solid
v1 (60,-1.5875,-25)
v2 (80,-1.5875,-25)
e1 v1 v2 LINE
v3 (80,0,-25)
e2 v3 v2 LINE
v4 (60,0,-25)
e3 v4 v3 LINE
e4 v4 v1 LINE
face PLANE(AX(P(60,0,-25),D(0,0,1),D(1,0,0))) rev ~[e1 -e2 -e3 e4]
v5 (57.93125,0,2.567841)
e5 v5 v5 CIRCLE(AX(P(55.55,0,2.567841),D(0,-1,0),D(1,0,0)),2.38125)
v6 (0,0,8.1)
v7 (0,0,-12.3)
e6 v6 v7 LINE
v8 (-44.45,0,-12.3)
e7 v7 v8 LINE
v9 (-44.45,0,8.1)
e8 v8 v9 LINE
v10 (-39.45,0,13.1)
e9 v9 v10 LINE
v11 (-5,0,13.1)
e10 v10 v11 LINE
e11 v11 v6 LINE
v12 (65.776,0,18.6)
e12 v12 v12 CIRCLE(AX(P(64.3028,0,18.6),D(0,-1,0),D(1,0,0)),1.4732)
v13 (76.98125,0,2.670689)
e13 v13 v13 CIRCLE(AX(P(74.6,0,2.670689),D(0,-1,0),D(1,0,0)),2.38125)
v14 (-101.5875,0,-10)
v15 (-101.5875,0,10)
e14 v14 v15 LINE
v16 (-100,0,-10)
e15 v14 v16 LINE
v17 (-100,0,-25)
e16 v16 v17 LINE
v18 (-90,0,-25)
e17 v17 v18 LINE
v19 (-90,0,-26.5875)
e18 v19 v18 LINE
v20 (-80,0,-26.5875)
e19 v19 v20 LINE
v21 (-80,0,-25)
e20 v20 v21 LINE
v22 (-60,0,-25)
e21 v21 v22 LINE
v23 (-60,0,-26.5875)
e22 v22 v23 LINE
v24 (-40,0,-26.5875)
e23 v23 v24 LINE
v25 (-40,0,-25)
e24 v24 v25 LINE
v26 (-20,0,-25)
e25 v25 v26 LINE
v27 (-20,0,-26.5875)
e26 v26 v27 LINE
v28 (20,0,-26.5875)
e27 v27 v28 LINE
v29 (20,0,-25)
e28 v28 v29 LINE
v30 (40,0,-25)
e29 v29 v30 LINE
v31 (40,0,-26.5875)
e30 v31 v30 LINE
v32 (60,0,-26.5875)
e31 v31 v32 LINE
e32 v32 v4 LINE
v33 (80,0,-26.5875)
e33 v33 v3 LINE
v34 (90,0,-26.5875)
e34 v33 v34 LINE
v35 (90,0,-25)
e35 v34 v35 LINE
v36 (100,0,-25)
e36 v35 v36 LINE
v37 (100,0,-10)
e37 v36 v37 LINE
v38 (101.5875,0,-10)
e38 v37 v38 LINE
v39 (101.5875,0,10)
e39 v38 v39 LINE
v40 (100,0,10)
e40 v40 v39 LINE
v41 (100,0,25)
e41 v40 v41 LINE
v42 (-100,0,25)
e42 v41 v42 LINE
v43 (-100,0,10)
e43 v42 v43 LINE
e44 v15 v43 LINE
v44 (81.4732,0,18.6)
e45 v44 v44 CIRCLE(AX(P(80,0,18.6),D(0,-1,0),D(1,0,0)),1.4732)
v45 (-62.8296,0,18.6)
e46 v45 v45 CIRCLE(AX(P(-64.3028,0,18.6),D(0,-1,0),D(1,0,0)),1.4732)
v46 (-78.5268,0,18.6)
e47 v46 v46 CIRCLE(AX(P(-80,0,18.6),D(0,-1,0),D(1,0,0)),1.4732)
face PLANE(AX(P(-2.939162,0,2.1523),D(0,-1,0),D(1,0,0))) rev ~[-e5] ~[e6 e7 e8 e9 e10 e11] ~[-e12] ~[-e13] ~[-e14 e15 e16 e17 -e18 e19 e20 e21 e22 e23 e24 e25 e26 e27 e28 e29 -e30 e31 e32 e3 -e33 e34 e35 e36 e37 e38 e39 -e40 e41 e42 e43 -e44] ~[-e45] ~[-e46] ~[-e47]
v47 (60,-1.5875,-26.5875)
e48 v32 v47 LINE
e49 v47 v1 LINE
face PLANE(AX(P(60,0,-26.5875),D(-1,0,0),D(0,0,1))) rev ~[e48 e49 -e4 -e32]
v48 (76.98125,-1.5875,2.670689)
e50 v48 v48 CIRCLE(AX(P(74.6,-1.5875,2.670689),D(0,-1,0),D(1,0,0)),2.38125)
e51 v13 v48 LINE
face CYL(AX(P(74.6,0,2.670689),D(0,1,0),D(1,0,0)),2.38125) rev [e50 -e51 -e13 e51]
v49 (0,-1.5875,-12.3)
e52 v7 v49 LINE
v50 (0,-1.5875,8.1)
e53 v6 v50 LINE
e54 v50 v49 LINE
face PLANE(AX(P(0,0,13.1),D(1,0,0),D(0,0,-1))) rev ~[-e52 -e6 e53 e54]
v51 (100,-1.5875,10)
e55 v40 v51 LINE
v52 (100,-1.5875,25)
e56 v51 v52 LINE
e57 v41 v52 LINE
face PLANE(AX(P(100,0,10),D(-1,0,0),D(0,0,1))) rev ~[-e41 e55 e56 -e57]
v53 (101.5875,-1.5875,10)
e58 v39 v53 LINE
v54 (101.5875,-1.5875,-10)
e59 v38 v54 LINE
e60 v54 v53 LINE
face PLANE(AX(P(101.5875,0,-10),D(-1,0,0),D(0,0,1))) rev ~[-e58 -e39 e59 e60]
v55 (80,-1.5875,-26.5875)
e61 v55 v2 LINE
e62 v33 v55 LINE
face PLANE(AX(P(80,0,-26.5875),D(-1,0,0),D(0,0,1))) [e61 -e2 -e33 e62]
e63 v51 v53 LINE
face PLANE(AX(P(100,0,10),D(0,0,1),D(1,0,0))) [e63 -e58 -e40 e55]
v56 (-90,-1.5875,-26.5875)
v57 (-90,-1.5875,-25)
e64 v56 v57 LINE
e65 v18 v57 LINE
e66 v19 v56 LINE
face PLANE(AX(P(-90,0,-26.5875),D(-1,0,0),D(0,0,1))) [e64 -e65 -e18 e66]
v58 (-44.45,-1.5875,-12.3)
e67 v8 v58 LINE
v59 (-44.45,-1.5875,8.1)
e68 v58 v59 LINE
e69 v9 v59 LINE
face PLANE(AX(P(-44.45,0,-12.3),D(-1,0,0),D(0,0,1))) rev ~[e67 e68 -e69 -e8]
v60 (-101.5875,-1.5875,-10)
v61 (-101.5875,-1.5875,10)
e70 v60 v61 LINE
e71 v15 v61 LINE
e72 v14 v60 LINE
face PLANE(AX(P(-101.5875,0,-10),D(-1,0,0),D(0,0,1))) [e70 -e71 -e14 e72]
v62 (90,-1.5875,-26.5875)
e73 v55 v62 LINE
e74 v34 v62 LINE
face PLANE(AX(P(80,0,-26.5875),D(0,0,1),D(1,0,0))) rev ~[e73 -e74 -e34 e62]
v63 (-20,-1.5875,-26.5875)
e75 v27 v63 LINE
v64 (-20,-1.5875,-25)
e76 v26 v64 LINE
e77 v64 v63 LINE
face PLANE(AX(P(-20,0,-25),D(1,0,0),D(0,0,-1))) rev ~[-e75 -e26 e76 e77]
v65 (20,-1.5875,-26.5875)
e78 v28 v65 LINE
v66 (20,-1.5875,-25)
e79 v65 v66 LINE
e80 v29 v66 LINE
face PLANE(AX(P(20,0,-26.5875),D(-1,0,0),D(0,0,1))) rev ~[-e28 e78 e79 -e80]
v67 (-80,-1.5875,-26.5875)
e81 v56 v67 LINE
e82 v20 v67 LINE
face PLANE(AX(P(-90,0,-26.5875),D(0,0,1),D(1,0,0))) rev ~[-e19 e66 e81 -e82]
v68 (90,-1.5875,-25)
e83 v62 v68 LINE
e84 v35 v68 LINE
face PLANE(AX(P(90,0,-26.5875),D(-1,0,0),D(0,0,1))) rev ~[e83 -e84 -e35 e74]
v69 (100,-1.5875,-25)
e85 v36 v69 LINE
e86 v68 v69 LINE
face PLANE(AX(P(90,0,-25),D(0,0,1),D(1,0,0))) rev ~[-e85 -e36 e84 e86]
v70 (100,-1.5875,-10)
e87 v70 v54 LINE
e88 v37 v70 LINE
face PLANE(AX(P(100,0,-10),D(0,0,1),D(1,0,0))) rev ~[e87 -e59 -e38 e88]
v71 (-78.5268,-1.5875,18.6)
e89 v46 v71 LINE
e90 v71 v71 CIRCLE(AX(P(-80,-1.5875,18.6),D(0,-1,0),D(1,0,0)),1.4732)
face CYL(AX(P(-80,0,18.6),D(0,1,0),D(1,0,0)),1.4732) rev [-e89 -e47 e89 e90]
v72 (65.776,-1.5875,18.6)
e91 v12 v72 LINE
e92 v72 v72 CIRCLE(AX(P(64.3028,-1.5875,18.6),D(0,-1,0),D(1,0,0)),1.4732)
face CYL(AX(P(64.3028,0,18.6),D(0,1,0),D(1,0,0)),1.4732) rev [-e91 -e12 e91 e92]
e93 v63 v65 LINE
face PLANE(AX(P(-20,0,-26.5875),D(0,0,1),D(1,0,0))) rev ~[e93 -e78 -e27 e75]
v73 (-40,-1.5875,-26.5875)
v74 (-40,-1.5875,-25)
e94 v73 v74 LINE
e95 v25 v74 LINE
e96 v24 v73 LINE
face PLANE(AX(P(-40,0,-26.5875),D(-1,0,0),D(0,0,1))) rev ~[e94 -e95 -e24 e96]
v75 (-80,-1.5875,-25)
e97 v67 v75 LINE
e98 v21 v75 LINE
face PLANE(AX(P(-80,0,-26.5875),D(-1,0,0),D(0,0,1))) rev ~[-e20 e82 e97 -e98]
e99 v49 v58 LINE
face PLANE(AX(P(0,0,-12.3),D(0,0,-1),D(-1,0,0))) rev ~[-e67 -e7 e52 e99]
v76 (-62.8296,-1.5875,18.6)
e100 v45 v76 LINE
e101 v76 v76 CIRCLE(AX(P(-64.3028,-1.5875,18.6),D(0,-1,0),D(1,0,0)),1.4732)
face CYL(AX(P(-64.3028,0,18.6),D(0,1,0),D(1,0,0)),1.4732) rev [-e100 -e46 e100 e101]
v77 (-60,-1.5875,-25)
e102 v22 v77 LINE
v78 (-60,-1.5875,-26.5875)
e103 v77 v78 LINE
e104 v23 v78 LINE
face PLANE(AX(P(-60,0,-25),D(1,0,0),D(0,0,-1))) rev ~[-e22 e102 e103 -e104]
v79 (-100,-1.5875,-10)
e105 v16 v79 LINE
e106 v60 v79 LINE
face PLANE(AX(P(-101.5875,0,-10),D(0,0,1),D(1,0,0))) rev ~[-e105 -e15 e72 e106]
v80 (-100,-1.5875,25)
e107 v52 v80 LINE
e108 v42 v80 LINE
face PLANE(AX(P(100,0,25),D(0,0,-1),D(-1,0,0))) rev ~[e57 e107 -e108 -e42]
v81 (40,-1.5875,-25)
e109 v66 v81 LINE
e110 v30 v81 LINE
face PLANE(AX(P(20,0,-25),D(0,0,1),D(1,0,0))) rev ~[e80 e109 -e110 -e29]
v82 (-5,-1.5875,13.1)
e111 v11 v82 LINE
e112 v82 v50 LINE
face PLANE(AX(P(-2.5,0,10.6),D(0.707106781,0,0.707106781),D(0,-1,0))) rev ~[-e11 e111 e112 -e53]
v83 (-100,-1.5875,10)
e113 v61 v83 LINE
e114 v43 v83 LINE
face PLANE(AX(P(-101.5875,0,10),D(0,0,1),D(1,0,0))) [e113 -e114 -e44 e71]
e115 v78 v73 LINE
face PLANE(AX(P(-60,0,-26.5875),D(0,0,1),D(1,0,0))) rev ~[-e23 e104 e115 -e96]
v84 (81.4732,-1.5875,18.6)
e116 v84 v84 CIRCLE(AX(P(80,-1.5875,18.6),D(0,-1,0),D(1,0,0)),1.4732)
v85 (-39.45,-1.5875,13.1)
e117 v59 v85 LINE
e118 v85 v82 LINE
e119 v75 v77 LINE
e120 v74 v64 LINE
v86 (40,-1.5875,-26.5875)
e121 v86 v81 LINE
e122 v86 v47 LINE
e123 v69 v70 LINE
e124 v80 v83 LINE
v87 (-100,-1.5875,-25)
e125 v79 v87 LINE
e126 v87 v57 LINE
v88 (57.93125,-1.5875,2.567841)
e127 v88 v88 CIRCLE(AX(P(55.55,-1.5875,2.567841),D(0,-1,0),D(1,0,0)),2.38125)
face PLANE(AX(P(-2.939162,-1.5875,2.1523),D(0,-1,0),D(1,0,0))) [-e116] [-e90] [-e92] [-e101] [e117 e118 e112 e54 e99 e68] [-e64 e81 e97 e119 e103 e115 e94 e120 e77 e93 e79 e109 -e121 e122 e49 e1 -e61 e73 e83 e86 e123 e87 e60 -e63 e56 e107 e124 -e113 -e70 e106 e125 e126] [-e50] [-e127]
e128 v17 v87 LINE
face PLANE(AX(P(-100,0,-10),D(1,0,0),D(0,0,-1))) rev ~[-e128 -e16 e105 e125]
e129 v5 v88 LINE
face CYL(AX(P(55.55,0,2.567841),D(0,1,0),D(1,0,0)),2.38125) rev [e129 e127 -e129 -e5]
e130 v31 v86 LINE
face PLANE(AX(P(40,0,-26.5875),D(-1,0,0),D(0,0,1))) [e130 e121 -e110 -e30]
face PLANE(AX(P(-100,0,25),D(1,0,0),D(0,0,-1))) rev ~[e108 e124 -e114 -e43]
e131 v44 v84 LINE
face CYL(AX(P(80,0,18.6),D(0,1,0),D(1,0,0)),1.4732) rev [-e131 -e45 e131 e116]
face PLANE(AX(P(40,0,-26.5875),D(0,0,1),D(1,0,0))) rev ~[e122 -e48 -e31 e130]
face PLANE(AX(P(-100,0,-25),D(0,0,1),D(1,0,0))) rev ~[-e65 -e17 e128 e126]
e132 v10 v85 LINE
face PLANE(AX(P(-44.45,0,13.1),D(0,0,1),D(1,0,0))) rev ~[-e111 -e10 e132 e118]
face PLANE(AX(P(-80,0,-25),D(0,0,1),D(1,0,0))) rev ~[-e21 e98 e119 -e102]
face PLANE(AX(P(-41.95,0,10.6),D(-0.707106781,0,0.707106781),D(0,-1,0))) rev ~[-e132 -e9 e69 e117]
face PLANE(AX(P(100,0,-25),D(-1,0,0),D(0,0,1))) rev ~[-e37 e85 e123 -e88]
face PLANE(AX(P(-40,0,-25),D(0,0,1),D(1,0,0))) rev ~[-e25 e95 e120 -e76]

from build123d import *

# Parameters (mm, degrees)
F0_R     = 1.4732
F0_R_2   = 2.38125
F0_W     = 1.5875
F0_H     = 20
F0_W_2   = 10
F0_H_2   = 1.5875
F0_W_3   = 20
F1_DEPTH = 1.5875
F2_SIZE  = 5


# Not quite as in the source:
# - a length typed as a fraction of an inch, garbled in the dataset ("3 / 203.2 mm" for 3/8 in), is restored


with BuildPart() as f1:
    # F0 (on Front) → F1 (new body)
    with BuildSketch(Plane.XZ):
        Polygon((100, 10), (100, 25), (-100, 25), (-100, 10), (-100, -10), (-100, -25), (-90, -25), (-80, -25), (-60, -25), (-44.45, -25), (-44.45, -12.3), (-44.45, 13.1), (0, 13.1), (0, -12.3), (0, -25), (20, -25), (40, -25), (60, -25), (80, -25), (90, -25), (100, -25), (100, -10), align=None)
        with Locations((-80, 18.6)):
            Circle(F0_R, mode=Mode.SUBTRACT)
        with Locations((-64.3028, 18.6)):
            Circle(F0_R, mode=Mode.SUBTRACT)
        with Locations((55.55, 2.5678405073)):
            Circle(F0_R_2, mode=Mode.SUBTRACT)
        with Locations((74.6, 2.6706890203)):
            Circle(F0_R_2, mode=Mode.SUBTRACT)
        with Locations((64.3028, 18.6)):
            Circle(F0_R, mode=Mode.SUBTRACT)
        with Locations((80, 18.6)):
            Circle(F0_R, mode=Mode.SUBTRACT)
        with Locations((100.79375, 0)):
            Rectangle(F0_W, F0_H)
        with Locations((-100.79375, 0)):
            Rectangle(F0_W, F0_H)
        with Locations((85, -25.79375)):
            Rectangle(F0_W_2, F0_H_2)
        with Locations((-85, -25.79375)):
            Rectangle(F0_W_2, F0_H_2)
        with Locations((50, -25.79375)):
            Rectangle(F0_W_3, F0_H_2)
        Polygon((-44.45, -25), (-60, -25), (-60, -26.5875), (-40, -26.5875), (-40, -25), align=None)
        Polygon((-44.45, -12.3), (-44.45, -25), (-40, -25), (-20, -25), (0, -25), (0, -12.3), align=None)
        Polygon((20, -26.5875), (20, -25), (0, -25), (-20, -25), (-20, -26.5875), align=None)
    extrude(amount=F1_DEPTH)

    # F2
    f2_edges = [f1.edges().sort_by_distance(p)[0] for p in [
        (-44.45, -0.79375, 13.1),
        (0, -0.79375, 13.1),
    ]]
    chamfer(f2_edges, length=F2_SIZE)


solid = f1.part
